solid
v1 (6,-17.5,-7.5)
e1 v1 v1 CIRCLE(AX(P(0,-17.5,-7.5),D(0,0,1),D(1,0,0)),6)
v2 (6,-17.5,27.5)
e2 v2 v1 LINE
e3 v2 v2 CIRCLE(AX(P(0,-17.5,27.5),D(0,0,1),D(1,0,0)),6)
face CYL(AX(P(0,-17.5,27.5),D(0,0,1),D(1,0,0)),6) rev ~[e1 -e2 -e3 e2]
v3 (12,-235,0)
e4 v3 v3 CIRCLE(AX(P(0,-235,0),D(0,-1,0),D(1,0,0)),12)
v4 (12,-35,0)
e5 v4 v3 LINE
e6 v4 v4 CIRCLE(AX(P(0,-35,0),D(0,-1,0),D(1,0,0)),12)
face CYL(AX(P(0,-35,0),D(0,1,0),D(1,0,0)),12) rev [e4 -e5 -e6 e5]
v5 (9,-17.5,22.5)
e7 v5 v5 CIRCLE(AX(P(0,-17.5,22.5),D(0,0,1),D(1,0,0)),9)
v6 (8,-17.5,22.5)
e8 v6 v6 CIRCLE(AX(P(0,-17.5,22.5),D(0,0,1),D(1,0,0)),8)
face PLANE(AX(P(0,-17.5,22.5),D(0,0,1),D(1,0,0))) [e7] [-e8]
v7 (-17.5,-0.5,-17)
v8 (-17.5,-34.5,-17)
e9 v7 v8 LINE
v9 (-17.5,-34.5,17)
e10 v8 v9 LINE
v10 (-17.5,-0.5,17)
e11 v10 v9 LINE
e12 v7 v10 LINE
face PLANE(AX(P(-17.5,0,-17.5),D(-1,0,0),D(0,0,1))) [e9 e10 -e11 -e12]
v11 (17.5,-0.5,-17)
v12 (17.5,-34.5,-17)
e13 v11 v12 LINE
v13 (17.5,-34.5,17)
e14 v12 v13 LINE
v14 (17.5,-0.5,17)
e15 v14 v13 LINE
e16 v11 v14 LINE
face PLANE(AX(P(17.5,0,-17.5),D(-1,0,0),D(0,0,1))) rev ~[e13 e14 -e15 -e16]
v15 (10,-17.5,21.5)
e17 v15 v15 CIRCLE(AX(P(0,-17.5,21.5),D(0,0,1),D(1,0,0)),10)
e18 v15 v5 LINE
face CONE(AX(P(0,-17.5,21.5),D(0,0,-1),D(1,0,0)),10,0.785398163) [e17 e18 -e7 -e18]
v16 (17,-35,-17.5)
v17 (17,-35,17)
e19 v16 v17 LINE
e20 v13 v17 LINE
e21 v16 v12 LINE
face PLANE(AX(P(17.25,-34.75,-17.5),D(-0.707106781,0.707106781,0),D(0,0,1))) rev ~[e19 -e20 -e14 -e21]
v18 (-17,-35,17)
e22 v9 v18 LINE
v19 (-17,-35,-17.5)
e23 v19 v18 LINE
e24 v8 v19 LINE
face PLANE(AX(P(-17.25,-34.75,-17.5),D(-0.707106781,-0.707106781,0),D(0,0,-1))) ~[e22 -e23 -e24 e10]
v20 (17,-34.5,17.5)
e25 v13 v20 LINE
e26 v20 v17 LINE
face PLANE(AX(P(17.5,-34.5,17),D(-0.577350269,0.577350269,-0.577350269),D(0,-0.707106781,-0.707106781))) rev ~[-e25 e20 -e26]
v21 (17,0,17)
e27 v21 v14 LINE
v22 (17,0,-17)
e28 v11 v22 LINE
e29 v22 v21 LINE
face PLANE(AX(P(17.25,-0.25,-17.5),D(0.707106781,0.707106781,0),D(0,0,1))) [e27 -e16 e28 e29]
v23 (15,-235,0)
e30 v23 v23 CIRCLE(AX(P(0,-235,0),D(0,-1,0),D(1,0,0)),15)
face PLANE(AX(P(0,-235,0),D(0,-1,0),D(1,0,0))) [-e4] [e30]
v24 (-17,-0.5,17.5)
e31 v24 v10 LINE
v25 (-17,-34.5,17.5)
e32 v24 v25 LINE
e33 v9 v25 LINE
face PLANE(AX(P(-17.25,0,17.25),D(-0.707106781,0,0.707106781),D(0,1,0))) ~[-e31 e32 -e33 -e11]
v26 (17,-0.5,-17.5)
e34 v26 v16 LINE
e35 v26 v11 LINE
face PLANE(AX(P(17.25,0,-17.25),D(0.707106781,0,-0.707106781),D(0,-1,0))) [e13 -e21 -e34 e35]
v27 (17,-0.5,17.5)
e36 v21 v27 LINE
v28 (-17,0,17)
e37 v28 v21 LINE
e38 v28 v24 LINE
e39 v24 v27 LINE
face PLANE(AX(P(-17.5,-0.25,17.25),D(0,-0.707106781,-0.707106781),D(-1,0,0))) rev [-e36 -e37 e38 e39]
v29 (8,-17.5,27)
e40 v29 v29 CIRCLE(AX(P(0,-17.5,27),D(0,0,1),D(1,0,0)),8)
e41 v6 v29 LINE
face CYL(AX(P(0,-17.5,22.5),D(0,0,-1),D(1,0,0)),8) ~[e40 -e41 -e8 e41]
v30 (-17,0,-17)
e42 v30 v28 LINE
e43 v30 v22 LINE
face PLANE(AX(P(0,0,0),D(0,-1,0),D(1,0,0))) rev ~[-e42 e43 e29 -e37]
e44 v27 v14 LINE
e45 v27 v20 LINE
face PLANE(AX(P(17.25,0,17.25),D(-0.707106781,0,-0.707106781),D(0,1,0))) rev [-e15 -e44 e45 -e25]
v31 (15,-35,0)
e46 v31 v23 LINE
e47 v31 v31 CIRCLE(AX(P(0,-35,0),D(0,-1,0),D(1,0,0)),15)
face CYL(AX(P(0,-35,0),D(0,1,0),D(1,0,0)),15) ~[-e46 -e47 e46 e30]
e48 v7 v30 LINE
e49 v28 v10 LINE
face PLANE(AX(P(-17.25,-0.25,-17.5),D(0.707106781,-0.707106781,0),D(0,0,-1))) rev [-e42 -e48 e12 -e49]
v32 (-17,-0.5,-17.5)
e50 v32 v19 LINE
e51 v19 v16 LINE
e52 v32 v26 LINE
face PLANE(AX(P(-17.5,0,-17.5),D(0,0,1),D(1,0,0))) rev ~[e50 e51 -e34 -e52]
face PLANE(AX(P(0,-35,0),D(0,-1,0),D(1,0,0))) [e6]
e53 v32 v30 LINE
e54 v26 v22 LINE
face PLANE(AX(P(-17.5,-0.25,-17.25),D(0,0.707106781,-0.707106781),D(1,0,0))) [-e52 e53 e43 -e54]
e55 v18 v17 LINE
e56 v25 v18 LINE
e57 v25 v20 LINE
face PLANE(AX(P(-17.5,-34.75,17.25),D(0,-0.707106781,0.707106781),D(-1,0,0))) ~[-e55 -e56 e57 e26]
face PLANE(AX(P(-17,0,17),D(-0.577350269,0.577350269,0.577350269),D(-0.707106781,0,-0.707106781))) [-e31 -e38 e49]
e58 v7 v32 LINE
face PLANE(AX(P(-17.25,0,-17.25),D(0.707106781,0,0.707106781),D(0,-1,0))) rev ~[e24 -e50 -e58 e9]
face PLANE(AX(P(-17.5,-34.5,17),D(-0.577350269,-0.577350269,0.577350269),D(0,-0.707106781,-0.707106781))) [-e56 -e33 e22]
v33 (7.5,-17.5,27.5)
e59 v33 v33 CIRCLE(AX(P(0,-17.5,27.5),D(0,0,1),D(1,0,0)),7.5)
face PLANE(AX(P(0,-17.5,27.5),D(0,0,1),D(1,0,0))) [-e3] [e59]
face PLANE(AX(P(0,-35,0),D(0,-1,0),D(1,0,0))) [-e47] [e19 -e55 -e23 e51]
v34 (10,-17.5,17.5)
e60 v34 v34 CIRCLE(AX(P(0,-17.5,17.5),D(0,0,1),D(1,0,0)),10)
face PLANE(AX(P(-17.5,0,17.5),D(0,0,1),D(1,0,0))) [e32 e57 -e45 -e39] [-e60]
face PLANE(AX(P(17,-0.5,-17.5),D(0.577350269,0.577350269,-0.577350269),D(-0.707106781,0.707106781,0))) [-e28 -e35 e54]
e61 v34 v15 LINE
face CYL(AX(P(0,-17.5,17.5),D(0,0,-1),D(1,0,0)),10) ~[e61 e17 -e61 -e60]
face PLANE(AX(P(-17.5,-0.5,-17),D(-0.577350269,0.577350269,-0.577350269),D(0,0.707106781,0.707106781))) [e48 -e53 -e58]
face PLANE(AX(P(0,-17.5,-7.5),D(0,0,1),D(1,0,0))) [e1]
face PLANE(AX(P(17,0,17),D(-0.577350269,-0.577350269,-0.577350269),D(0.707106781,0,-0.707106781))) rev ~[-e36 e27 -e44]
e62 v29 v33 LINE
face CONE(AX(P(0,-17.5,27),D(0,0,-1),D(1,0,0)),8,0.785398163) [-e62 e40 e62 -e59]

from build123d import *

# Parameters (mm, degrees)
F0_W      = 35
F0_H      = 35
F1_DEPTH  = 35
F2_R      = 15
F2_R_2    = 12
F3_DEPTH  = 200
F4_R      = 10
F5_DEPTH  = 5
F6_R      = 8
F7_DEPTH  = 5
F8_SIZE   = 1
F9_SIZE   = 0.5
F10_R     = 6
F11_DEPTH = 35
F12_SIZE  = 0.5


# Not quite as in the source:
# - a feature names something its author has since deleted; it is built from what else it names


with BuildPart() as f1:
    # F0 (on Front) → F1 (new body)
    with BuildSketch(Plane.XZ):
        Rectangle(F0_W, F0_H)
    extrude(amount=F1_DEPTH)

    # F2 (on face) → F3 (join)
    with BuildSketch(Plane.XZ.offset(35)):
        Circle(F2_R)
        Circle(F2_R_2, mode=Mode.SUBTRACT)
    extrude(amount=F3_DEPTH)

    # F4 (on face) → F5 (join)
    with BuildSketch(Plane.XY.offset(17.5)):
        with Locations((0, -17.5)):
            Circle(F4_R)
    extrude(amount=F5_DEPTH)

    # F6 (on face) → F7 (join)
    with BuildSketch(Plane.XY.offset(22.5)):
        with Locations((0, -17.5)):
            Circle(F6_R)
    extrude(amount=F7_DEPTH)

    # F8
    f8_edges = [f1.edges().sort_by_distance(p)[0] for p in [
        (-10, -17.5, 22.5),
    ]]
    chamfer(f8_edges, length=F8_SIZE)

    # F9
    f9_edges = [f1.edges().sort_by_distance(p)[0] for p in [
        (-8, -17.5, 27.5),
    ]]
    chamfer(f9_edges, length=F9_SIZE)

    # F10 (on face) → F11 (cut)
    with BuildSketch(Plane.XY.offset(27.5)):
        with Locations((0, -17.5)):
            Circle(F10_R)
    extrude(amount=-F11_DEPTH, mode=Mode.SUBTRACT)

    # F12
    f12_edges = [f1.edges().sort_by_distance(p)[0] for p in [
        (0, -35, 17.5),
        (-17.5, -17.5, 17.5),
        (17.5, -17.5, 17.5),
        (0, 0, 17.5),
        (17.5, 0, 0),
        (17.5, -35, 0),
        (17.5, -17.5, -17.5),
        (0, 0, -17.5),
        (-17.5, -35, 0),
        (-17.5, -17.5, -17.5),
        (-17.5, 0, 0),
    ]]
    chamfer(f12_edges, length=F12_SIZE)


solid = f1.part
